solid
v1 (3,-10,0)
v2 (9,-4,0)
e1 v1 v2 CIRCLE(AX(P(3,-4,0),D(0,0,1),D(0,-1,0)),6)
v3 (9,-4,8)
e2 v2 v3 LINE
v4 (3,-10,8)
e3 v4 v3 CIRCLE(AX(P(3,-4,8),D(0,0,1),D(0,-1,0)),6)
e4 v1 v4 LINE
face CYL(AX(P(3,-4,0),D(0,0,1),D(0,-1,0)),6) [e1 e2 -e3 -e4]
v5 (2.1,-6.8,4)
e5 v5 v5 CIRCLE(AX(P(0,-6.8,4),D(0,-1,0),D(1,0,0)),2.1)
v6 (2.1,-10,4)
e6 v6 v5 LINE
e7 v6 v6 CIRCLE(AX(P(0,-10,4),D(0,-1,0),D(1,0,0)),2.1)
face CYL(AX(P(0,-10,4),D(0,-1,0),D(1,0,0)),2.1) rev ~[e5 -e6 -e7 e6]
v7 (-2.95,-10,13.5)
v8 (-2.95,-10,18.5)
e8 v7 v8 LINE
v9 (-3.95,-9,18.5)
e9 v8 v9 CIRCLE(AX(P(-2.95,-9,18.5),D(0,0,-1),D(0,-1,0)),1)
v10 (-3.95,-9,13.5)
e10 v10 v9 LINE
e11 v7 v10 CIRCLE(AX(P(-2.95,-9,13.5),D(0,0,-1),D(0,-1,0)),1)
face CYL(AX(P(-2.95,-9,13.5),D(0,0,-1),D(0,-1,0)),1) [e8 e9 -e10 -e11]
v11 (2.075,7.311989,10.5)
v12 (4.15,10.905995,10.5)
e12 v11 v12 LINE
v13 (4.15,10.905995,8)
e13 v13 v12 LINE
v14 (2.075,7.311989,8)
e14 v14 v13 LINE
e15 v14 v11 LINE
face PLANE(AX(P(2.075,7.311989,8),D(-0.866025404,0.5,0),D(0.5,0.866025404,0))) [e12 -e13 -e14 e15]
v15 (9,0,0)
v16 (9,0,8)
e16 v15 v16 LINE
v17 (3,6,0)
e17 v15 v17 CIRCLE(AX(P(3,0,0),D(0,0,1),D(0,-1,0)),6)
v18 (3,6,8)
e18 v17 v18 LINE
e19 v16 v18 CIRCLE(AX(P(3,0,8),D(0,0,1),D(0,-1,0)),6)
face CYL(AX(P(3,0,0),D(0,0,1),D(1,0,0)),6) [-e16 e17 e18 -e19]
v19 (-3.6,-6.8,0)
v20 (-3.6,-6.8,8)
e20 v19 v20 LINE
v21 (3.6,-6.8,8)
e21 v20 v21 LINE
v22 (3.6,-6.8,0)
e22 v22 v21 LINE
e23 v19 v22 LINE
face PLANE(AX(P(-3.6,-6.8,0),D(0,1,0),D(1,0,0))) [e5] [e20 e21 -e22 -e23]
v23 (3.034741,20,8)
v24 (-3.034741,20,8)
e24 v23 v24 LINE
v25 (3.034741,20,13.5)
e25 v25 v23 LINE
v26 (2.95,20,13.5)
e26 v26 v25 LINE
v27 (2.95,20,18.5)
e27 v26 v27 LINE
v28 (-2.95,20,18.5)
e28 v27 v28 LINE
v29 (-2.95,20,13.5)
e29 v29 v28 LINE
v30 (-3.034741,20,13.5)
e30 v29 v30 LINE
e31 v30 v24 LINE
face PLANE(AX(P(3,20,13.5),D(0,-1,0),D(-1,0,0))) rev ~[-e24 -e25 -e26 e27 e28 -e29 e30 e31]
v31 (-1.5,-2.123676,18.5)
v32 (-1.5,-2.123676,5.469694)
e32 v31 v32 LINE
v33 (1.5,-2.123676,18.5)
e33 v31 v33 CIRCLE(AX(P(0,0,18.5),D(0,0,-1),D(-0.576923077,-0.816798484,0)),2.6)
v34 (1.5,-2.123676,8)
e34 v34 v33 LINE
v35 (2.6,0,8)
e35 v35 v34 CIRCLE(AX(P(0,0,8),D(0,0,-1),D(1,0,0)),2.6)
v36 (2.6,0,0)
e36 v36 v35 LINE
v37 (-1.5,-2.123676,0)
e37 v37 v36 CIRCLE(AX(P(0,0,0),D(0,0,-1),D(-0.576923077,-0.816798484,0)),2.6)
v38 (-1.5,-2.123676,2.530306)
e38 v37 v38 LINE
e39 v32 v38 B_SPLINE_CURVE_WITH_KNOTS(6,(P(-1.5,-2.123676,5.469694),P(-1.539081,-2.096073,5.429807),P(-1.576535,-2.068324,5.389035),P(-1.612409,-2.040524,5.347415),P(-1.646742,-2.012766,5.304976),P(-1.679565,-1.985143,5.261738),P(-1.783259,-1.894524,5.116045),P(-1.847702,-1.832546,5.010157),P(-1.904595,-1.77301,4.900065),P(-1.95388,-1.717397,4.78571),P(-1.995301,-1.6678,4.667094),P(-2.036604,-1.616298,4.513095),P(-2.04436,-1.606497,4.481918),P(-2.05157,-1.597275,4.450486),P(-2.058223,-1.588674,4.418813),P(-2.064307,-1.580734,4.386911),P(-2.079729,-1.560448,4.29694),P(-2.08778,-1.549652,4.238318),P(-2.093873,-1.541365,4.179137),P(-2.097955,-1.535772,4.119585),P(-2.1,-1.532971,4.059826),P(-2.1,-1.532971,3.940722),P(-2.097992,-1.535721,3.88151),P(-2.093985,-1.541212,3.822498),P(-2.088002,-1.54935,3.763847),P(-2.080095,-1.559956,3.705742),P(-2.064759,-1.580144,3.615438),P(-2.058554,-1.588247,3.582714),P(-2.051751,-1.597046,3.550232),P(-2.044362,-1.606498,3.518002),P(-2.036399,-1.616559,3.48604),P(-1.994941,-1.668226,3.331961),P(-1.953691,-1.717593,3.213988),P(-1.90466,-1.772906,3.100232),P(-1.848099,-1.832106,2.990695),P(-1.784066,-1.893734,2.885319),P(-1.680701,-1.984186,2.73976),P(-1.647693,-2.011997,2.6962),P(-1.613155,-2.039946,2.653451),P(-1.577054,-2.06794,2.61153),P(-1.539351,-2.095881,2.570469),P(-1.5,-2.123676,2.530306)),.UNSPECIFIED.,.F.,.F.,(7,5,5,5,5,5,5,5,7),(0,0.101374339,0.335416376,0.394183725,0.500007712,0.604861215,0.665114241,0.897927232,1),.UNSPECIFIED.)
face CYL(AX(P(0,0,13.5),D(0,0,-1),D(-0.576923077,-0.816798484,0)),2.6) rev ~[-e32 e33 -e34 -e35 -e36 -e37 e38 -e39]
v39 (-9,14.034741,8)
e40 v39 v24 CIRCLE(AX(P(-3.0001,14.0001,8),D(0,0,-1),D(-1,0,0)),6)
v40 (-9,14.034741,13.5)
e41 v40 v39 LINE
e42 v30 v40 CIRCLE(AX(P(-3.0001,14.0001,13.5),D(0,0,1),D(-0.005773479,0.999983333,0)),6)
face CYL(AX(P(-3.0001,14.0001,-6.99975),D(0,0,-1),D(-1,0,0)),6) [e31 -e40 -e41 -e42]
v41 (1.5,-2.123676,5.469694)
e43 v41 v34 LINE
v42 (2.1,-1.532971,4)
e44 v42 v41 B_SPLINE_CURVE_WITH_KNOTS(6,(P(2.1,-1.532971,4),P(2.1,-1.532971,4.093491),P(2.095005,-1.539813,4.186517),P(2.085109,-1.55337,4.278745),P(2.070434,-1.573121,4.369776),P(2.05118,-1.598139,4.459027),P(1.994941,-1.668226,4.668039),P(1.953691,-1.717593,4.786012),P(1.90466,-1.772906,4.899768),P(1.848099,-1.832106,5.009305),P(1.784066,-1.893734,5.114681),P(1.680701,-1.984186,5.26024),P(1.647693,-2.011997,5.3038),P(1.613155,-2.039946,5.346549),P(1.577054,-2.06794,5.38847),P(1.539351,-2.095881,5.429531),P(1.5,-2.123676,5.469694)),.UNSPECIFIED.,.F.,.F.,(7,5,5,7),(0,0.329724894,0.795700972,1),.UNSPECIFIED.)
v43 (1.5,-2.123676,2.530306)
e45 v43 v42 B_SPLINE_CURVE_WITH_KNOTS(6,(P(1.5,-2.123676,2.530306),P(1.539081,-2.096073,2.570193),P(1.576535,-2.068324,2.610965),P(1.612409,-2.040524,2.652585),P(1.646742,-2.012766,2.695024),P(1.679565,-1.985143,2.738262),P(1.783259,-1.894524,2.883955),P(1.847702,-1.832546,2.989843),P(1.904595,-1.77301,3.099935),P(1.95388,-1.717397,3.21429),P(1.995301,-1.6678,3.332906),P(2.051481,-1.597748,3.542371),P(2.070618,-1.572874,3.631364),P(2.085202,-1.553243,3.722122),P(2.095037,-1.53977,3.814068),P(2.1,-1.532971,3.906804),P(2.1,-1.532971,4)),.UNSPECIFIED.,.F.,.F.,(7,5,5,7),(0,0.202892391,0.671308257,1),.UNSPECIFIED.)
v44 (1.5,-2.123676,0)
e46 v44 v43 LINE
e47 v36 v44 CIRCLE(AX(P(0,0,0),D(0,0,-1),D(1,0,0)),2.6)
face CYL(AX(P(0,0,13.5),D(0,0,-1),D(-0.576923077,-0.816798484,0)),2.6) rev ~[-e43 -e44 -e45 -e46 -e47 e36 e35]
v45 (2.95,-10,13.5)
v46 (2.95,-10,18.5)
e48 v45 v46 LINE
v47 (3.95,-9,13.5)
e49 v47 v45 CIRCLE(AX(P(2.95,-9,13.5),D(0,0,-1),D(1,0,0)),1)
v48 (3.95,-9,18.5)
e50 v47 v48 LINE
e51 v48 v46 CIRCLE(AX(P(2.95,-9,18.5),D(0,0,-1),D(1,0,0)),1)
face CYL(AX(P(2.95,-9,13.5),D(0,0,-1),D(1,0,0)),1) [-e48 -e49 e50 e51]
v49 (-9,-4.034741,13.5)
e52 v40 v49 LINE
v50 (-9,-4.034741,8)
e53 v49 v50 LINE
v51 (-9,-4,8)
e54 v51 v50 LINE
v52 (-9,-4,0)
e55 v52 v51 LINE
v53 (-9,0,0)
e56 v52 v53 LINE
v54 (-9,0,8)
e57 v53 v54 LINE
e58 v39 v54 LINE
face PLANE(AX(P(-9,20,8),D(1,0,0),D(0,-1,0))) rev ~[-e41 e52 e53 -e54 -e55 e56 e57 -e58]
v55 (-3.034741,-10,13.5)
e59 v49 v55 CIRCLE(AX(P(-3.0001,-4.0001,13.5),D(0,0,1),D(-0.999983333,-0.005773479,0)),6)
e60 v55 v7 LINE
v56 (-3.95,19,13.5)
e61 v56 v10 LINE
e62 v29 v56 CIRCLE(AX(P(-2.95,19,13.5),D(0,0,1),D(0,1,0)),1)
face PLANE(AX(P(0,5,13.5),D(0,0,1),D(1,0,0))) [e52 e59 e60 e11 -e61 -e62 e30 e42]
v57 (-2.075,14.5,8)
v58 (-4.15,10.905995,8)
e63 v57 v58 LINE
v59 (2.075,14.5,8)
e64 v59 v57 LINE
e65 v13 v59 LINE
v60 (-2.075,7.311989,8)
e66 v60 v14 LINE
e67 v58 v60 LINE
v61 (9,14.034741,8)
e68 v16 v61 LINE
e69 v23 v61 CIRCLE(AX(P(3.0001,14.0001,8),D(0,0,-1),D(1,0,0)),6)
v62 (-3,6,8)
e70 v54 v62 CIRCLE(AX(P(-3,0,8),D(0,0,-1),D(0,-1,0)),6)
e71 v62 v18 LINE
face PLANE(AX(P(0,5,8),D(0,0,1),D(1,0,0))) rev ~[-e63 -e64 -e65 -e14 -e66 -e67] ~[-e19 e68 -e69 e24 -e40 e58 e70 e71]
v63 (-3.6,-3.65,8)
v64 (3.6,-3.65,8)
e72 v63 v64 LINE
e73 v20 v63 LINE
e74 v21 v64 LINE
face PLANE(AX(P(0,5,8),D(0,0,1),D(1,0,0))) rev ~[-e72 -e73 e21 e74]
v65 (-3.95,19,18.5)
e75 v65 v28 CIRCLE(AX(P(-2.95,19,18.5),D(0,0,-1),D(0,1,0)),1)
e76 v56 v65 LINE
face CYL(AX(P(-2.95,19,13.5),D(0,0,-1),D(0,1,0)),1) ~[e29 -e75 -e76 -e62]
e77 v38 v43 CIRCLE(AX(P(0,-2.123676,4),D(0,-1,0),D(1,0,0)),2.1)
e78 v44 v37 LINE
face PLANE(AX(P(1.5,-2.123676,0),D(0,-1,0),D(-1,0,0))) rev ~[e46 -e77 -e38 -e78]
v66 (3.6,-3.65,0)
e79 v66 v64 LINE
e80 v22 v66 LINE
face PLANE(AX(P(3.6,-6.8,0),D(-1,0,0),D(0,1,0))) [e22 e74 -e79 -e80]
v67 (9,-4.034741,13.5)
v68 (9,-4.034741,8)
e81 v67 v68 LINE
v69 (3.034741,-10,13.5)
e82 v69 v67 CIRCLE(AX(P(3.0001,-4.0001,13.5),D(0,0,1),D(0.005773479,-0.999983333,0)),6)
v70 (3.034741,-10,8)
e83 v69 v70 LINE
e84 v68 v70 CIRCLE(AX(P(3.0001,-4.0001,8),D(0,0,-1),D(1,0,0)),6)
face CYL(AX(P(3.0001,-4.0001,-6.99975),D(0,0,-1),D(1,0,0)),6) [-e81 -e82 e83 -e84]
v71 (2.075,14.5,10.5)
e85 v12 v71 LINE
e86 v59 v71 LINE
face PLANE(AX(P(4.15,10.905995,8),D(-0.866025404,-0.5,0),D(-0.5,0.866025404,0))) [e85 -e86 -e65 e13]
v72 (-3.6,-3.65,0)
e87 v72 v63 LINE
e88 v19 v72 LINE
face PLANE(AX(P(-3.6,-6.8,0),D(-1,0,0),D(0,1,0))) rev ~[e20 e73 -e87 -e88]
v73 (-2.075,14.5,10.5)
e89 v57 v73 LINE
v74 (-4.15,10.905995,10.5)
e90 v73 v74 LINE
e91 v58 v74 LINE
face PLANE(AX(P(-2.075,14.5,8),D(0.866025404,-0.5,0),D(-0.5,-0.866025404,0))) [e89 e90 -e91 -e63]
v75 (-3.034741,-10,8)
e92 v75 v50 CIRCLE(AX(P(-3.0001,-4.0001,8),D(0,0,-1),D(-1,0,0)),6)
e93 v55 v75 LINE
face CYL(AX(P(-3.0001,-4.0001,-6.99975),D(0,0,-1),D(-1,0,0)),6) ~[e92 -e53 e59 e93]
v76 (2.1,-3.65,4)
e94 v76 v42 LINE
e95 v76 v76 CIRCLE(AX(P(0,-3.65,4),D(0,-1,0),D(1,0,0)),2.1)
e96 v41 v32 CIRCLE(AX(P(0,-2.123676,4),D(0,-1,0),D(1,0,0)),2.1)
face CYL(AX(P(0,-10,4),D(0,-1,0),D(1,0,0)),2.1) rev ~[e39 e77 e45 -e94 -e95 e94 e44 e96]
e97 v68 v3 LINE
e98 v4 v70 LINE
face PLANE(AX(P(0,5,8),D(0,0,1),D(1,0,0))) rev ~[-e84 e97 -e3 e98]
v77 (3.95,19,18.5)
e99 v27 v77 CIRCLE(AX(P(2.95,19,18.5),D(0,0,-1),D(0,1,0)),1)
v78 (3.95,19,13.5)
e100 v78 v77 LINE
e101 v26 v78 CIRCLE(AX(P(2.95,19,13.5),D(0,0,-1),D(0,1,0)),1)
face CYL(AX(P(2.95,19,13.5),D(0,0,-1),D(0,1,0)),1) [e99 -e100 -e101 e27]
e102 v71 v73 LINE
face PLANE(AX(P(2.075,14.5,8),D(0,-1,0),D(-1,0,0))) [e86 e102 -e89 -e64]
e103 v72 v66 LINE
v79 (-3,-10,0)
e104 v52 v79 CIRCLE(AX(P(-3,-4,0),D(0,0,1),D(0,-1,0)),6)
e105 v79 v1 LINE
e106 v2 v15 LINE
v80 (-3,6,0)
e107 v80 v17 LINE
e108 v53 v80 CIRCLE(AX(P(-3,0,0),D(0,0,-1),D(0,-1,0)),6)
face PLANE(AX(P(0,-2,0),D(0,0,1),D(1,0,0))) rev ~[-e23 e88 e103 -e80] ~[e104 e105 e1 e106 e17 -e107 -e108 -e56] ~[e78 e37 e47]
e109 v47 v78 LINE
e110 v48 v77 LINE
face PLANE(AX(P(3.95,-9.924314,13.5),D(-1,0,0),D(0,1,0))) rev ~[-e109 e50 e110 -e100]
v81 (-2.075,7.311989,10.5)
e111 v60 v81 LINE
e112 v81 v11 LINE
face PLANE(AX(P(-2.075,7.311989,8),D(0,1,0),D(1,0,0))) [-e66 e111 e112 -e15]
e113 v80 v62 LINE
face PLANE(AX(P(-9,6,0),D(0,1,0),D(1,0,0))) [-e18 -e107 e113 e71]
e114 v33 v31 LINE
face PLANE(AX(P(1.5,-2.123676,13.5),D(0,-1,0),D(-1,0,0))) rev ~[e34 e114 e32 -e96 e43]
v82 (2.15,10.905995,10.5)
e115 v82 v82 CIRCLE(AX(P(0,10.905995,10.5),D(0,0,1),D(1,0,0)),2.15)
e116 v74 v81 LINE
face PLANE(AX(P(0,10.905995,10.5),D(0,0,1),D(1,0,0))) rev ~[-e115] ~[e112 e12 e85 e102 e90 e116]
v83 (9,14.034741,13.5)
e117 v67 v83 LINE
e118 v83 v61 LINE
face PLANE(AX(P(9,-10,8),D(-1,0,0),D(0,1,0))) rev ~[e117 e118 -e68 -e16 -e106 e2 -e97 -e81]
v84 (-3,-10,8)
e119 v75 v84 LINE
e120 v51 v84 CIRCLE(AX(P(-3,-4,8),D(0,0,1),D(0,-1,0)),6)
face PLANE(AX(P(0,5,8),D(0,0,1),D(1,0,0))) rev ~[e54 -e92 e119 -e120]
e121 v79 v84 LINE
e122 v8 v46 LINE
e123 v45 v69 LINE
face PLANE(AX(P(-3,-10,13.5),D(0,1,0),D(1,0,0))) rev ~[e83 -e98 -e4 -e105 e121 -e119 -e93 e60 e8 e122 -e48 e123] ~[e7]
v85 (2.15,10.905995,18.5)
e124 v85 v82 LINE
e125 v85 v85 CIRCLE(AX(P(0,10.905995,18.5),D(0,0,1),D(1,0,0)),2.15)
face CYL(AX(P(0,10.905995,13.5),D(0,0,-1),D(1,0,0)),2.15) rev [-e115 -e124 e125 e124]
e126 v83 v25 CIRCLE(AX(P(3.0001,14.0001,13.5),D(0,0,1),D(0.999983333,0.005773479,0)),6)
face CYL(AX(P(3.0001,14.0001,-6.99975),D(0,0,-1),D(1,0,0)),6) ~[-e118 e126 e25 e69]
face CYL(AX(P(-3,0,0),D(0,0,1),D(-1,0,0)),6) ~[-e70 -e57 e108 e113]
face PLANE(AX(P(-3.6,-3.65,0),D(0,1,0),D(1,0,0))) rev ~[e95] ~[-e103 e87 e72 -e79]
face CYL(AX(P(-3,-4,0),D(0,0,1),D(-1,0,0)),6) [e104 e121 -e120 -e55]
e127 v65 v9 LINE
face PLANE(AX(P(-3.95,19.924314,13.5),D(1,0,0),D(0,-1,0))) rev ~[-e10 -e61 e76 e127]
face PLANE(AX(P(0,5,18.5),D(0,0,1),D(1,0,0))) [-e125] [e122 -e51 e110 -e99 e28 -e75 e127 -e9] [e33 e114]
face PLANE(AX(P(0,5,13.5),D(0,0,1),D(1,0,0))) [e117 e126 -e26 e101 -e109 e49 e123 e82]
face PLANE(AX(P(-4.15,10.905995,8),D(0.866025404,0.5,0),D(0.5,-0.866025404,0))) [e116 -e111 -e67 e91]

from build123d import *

# Parameters (mm, degrees)
F0_W         = 18
F0_H         = 16
F0_W_2       = 7.2
F0_H_2       = 3.15
F1_DEPTH     = 8
F2_R         = 6
F4_R         = 2.1
F5_DEPTH     = 10
F7_R         = 2.15
F8_DEPTH     = 5.5
F9_DEPTH     = 2.5
F10_T1_DEPTH = 35.4995000042
F12_R        = 2.15
F13_DEPTH    = 5
F14_T1_DEPTH = 7.5071501803


# Not quite as in the source:
# - a fillet or chamfer that OpenCascade refuses, or shapes differently, is made with other operations: its cross-section is extruded or revolved along the edge and cut away or added


with BuildPart() as f1:
    # F0 (on Top) → F1 (new body)
    with BuildSketch(Plane.XY):
        with Locations((0, -2)):
            Rectangle(F0_W, F0_H)
        with Locations((0, -5.225)):
            Rectangle(F0_W_2, F0_H_2, mode=Mode.SUBTRACT)
        with BuildLine():
            ThreePointArc((-1.5, -2.1236760582), (-1.1958260743, 2.3086792761), (2.6, 0))
            ThreePointArc((2.6, 0), (2.3086792761, -1.1958260743), (1.5, -2.1236760582))
            ThreePointArc((1.5, -2.1236760582), (0, -2.6), (-1.5, -2.1236760582))
        make_face(mode=Mode.SUBTRACT)
        with BuildLine():
            Line((1.5, -2.1236760582), (-1.5, -2.1236760582))
            ThreePointArc((-1.5, -2.1236760582), (0, -2.6), (1.5, -2.1236760582))
        make_face()
    extrude(amount=F1_DEPTH)

    # F2
    f2_edges = [f1.edges().sort_by_distance(p)[0] for p in [
        (9, -10, 4),
        (-9, -10, 4),
        (9, 6, 4),
        (-9, 6, 4),
    ]]
    fillet(f2_edges, radius=F2_R)

    # F4 (on offset) → F5 (cut)
    with BuildSketch(Plane.XZ.offset(10)):
        with Locations((0, 4)):
            Circle(F4_R)
    extrude(amount=-F5_DEPTH, mode=Mode.SUBTRACT)

    # F7 (on offset) → F8 (join)
    with BuildSketch(Plane.XY.offset(8)):
        Polygon((-9, 20), (-9, 0), (-9, -4), (-9, -10), (-3, -10), (3, -10), (9, -10), (9, -4), (9, 0), (9, 20), align=None)
        with BuildLine():
            ThreePointArc((-1.5, -2.1236760582), (0, 2.6), (1.5, -2.1236760582))
            Line((1.5, -2.1236760582), (-1.5, -2.1236760582))
        make_face(mode=Mode.SUBTRACT)
        with BuildLine():
            ThreePointArc((2.075, 14.5), (3.5940054257, 12.9809945743), (4.15, 10.9059945743))
            ThreePointArc((4.15, 10.9059945743), (3.5940054257, 8.8309945743), (2.075, 7.3119891486))
            ThreePointArc((2.075, 7.3119891486), (0, 6.7559945743), (-2.075, 7.3119891486))
            ThreePointArc((-2.075, 7.3119891486), (-3.5940054257, 8.8309945743), (-4.15, 10.9059945743))
            ThreePointArc((-4.15, 10.9059945743), (-3.5940054257, 12.9809945743), (-2.075, 14.5))
            ThreePointArc((-2.075, 14.5), (0, 15.0559945743), (2.075, 14.5))
        make_face(mode=Mode.SUBTRACT)
        with BuildLine():
            ThreePointArc((-4.15, 10.9059945743), (-3.5940054257, 8.8309945743), (-2.075, 7.3119891486))
            Line((-2.075, 7.3119891486), (-4.15, 10.9059945743))
        make_face()
        with BuildLine():
            Line((-4.15, 10.9059945743), (-2.075, 14.5))
            ThreePointArc((-2.075, 14.5), (-3.5940054257, 12.9809945743), (-4.15, 10.9059945743))
        make_face()
        with BuildLine():
            Line((-2.075, 14.5), (2.075, 14.5))
            ThreePointArc((2.075, 14.5), (0, 15.0559945743), (-2.075, 14.5))
        make_face()
        with BuildLine():
            Line((2.075, 14.5), (4.15, 10.9059945743))
            ThreePointArc((4.15, 10.9059945743), (3.5940054257, 12.9809945743), (2.075, 14.5))
        make_face()
        with BuildLine():
            ThreePointArc((2.075, 7.3119891486), (3.5940054257, 8.8309945743), (4.15, 10.9059945743))
            Line((4.15, 10.9059945743), (2.075, 7.3119891486))
        make_face()
        with BuildLine():
            ThreePointArc((-2.075, 7.3119891486), (0, 6.7559945743), (2.075, 7.3119891486))
            Line((2.075, 7.3119891486), (-2.075, 7.3119891486))
        make_face()
        Polygon((2.075, 7.3119891486), (4.15, 10.9059945743), (2.075, 14.5), (-2.075, 14.5), (-4.15, 10.9059945743), (-2.075, 7.3119891486), align=None)
        with Locations((0, 10.9059945743)):
            Circle(F7_R, mode=Mode.SUBTRACT)
    extrude(amount=F8_DEPTH)

    # F7 (on offset) → F9 (cut)
    with BuildSketch(Plane.XY.offset(8)):
        Polygon((2.075, 7.3119891486), (4.15, 10.9059945743), (2.075, 14.5), (-2.075, 14.5), (-4.15, 10.9059945743), (-2.075, 7.3119891486), align=None)
        with Locations((0, 10.9059945743)):
            Circle(F7_R, mode=Mode.SUBTRACT)
    extrude(amount=F9_DEPTH, mode=Mode.SUBTRACT)

    # F10: fillet of radius 6 on 4 edges, made by hand

    # F10_s2 → F10_t1 (cut)
    with BuildSketch(Plane.XY.offset(-6.9997500021)):
        with BuildLine():
            ThreePointArc((-9.0001, -4.0001), (-7.2427406871, -8.2427406871), (-3.0001, -10.0001))
            Line((-3.0001, -10.0001), (-3.0001, -10.1201))
            ThreePointArc((-3.0001, -10.1201), (-6.00005, -10.12), (-9, -10.12))
            Line((-9, -10.12), (-9.12, -10))
            ThreePointArc((-9.12, -10), (-9.12, -7.00005), (-9.1201, -4.0001))
            Line((-9.1201, -4.0001), (-9.0001, -4.0001))
        make_face()
        with BuildLine():
            ThreePointArc((9.0001, -4.0001), (7.2427406871, -8.2427406871), (3.0001, -10.0001))
            Line((3.0001, -10.0001), (3.0001, -10.1201))
            ThreePointArc((3.0001, -10.1201), (6.00005, -10.12), (9, -10.12))
            Line((9, -10.12), (9.12, -10))
            ThreePointArc((9.12, -10), (9.12, -7.00005), (9.1201, -4.0001))
            Line((9.1201, -4.0001), (9.0001, -4.0001))
        make_face()
        with BuildLine():
            ThreePointArc((9.0001, 14.0001), (7.2427406871, 18.2427406871), (3.0001, 20.0001))
            Line((3.0001, 20.0001), (3.0001, 20.1201))
            ThreePointArc((3.0001, 20.1201), (6.00005, 20.12), (9, 20.12))
            Line((9, 20.12), (9.12, 20))
            ThreePointArc((9.12, 20), (9.12, 17.00005), (9.1201, 14.0001))
            Line((9.1201, 14.0001), (9.0001, 14.0001))
        make_face()
        with BuildLine():
            ThreePointArc((-9.0001, 14.0001), (-7.2427406871, 18.2427406871), (-3.0001, 20.0001))
            Line((-3.0001, 20.0001), (-3.0001, 20.1201))
            ThreePointArc((-3.0001, 20.1201), (-6.00005, 20.12), (-9, 20.12))
            Line((-9, 20.12), (-9.12, 20))
            ThreePointArc((-9.12, 20), (-9.12, 17.00005), (-9.1201, 14.0001))
            Line((-9.1201, 14.0001), (-9.0001, 14.0001))
        make_face()
    extrude(amount=F10_T1_DEPTH, mode=Mode.SUBTRACT)

    # F12 (on offset) → F13 (join)
    with BuildSketch(Plane.XY.offset(13.5)):
        with BuildLine():
            Line((-3.95, 19.9243143063), (-3.95, -9.9243143063))
            ThreePointArc((-3.95, -9.9243143063), (-3.4765050693, -9.9810486471), (-3, -10))
            Line((-3, -10), (3, -10))
            ThreePointArc((3, -10), (3.4765050693, -9.9810486471), (3.95, -9.9243143063))
            Line((3.95, -9.9243143063), (3.95, 19.9243143063))
            ThreePointArc((3.95, 19.9243143063), (3.4765050693, 19.9810486471), (3, 20))
            Line((3, 20), (-3, 20))
            ThreePointArc((-3, 20), (-3.4765050693, 19.9810486471), (-3.95, 19.9243143063))
        make_face()
        with BuildLine():
            Line((1.5, -2.1236760582), (-1.5, -2.1236760582))
            ThreePointArc((-1.5, -2.1236760582), (0, 2.6), (1.5, -2.1236760582))
        make_face(mode=Mode.SUBTRACT)
        with Locations((0, 10.9059945743)):
            Circle(F12_R, mode=Mode.SUBTRACT)
    extrude(amount=F13_DEPTH)

    # F14: fillet of radius 1 on 4 edges, made by hand

    # F14_s2 → F14_t1 (cut)
    with BuildSketch(Plane.XY.offset(13.5)):
        with BuildLine():
            ThreePointArc((3.95, -9), (3.6571067812, -9.7071067812), (2.95, -10))
            Line((2.95, -10), (2.95, -10.1))
            ThreePointArc((2.95, -10.1), (3, -10.1), (3.9658333333, -10.0230528781))
            Line((3.9658333333, -10.0230528781), (4.05, -9.9243143063))
            Line((4.05, -9.9243143063), (4.05, -9))
            Line((4.05, -9), (3.95, -9))
        make_face()
        with BuildLine():
            ThreePointArc((-2.95, -10), (-3.6571067812, -9.7071067812), (-3.95, -9))
            Line((-3.95, -9), (-4.05, -9))
            Line((-4.05, -9), (-4.05, -9.9243143063))
            Line((-4.05, -9.9243143063), (-3.9658333333, -10.0230528781))
            ThreePointArc((-3.9658333333, -10.0230528781), (-3, -10.1), (-2.95, -10.1))
            Line((-2.95, -10.1), (-2.95, -10))
        make_face()
        with BuildLine():
            ThreePointArc((2.95, 20), (3.6571067812, 19.7071067812), (3.95, 19))
            Line((3.95, 19), (4.05, 19))
            Line((4.05, 19), (4.05, 19.9243143063))
            Line((4.05, 19.9243143063), (3.9658333333, 20.0230528781))
            ThreePointArc((3.9658333333, 20.0230528781), (3, 20.1), (2.95, 20.1))
            Line((2.95, 20.1), (2.95, 20))
        make_face()
        with BuildLine():
            ThreePointArc((-2.95, 20), (-3.6571067812, 19.7071067812), (-3.95, 19))
            Line((-3.95, 19), (-4.05, 19))
            Line((-4.05, 19), (-4.05, 19.9243143063))
            Line((-4.05, 19.9243143063), (-3.9658333333, 20.0230528781))
            ThreePointArc((-3.9658333333, 20.0230528781), (-3, 20.1), (-2.95, 20.1))
            Line((-2.95, 20.1), (-2.95, 20))
        make_face()
    extrude(amount=F14_T1_DEPTH, mode=Mode.SUBTRACT)


solid = f1.part
